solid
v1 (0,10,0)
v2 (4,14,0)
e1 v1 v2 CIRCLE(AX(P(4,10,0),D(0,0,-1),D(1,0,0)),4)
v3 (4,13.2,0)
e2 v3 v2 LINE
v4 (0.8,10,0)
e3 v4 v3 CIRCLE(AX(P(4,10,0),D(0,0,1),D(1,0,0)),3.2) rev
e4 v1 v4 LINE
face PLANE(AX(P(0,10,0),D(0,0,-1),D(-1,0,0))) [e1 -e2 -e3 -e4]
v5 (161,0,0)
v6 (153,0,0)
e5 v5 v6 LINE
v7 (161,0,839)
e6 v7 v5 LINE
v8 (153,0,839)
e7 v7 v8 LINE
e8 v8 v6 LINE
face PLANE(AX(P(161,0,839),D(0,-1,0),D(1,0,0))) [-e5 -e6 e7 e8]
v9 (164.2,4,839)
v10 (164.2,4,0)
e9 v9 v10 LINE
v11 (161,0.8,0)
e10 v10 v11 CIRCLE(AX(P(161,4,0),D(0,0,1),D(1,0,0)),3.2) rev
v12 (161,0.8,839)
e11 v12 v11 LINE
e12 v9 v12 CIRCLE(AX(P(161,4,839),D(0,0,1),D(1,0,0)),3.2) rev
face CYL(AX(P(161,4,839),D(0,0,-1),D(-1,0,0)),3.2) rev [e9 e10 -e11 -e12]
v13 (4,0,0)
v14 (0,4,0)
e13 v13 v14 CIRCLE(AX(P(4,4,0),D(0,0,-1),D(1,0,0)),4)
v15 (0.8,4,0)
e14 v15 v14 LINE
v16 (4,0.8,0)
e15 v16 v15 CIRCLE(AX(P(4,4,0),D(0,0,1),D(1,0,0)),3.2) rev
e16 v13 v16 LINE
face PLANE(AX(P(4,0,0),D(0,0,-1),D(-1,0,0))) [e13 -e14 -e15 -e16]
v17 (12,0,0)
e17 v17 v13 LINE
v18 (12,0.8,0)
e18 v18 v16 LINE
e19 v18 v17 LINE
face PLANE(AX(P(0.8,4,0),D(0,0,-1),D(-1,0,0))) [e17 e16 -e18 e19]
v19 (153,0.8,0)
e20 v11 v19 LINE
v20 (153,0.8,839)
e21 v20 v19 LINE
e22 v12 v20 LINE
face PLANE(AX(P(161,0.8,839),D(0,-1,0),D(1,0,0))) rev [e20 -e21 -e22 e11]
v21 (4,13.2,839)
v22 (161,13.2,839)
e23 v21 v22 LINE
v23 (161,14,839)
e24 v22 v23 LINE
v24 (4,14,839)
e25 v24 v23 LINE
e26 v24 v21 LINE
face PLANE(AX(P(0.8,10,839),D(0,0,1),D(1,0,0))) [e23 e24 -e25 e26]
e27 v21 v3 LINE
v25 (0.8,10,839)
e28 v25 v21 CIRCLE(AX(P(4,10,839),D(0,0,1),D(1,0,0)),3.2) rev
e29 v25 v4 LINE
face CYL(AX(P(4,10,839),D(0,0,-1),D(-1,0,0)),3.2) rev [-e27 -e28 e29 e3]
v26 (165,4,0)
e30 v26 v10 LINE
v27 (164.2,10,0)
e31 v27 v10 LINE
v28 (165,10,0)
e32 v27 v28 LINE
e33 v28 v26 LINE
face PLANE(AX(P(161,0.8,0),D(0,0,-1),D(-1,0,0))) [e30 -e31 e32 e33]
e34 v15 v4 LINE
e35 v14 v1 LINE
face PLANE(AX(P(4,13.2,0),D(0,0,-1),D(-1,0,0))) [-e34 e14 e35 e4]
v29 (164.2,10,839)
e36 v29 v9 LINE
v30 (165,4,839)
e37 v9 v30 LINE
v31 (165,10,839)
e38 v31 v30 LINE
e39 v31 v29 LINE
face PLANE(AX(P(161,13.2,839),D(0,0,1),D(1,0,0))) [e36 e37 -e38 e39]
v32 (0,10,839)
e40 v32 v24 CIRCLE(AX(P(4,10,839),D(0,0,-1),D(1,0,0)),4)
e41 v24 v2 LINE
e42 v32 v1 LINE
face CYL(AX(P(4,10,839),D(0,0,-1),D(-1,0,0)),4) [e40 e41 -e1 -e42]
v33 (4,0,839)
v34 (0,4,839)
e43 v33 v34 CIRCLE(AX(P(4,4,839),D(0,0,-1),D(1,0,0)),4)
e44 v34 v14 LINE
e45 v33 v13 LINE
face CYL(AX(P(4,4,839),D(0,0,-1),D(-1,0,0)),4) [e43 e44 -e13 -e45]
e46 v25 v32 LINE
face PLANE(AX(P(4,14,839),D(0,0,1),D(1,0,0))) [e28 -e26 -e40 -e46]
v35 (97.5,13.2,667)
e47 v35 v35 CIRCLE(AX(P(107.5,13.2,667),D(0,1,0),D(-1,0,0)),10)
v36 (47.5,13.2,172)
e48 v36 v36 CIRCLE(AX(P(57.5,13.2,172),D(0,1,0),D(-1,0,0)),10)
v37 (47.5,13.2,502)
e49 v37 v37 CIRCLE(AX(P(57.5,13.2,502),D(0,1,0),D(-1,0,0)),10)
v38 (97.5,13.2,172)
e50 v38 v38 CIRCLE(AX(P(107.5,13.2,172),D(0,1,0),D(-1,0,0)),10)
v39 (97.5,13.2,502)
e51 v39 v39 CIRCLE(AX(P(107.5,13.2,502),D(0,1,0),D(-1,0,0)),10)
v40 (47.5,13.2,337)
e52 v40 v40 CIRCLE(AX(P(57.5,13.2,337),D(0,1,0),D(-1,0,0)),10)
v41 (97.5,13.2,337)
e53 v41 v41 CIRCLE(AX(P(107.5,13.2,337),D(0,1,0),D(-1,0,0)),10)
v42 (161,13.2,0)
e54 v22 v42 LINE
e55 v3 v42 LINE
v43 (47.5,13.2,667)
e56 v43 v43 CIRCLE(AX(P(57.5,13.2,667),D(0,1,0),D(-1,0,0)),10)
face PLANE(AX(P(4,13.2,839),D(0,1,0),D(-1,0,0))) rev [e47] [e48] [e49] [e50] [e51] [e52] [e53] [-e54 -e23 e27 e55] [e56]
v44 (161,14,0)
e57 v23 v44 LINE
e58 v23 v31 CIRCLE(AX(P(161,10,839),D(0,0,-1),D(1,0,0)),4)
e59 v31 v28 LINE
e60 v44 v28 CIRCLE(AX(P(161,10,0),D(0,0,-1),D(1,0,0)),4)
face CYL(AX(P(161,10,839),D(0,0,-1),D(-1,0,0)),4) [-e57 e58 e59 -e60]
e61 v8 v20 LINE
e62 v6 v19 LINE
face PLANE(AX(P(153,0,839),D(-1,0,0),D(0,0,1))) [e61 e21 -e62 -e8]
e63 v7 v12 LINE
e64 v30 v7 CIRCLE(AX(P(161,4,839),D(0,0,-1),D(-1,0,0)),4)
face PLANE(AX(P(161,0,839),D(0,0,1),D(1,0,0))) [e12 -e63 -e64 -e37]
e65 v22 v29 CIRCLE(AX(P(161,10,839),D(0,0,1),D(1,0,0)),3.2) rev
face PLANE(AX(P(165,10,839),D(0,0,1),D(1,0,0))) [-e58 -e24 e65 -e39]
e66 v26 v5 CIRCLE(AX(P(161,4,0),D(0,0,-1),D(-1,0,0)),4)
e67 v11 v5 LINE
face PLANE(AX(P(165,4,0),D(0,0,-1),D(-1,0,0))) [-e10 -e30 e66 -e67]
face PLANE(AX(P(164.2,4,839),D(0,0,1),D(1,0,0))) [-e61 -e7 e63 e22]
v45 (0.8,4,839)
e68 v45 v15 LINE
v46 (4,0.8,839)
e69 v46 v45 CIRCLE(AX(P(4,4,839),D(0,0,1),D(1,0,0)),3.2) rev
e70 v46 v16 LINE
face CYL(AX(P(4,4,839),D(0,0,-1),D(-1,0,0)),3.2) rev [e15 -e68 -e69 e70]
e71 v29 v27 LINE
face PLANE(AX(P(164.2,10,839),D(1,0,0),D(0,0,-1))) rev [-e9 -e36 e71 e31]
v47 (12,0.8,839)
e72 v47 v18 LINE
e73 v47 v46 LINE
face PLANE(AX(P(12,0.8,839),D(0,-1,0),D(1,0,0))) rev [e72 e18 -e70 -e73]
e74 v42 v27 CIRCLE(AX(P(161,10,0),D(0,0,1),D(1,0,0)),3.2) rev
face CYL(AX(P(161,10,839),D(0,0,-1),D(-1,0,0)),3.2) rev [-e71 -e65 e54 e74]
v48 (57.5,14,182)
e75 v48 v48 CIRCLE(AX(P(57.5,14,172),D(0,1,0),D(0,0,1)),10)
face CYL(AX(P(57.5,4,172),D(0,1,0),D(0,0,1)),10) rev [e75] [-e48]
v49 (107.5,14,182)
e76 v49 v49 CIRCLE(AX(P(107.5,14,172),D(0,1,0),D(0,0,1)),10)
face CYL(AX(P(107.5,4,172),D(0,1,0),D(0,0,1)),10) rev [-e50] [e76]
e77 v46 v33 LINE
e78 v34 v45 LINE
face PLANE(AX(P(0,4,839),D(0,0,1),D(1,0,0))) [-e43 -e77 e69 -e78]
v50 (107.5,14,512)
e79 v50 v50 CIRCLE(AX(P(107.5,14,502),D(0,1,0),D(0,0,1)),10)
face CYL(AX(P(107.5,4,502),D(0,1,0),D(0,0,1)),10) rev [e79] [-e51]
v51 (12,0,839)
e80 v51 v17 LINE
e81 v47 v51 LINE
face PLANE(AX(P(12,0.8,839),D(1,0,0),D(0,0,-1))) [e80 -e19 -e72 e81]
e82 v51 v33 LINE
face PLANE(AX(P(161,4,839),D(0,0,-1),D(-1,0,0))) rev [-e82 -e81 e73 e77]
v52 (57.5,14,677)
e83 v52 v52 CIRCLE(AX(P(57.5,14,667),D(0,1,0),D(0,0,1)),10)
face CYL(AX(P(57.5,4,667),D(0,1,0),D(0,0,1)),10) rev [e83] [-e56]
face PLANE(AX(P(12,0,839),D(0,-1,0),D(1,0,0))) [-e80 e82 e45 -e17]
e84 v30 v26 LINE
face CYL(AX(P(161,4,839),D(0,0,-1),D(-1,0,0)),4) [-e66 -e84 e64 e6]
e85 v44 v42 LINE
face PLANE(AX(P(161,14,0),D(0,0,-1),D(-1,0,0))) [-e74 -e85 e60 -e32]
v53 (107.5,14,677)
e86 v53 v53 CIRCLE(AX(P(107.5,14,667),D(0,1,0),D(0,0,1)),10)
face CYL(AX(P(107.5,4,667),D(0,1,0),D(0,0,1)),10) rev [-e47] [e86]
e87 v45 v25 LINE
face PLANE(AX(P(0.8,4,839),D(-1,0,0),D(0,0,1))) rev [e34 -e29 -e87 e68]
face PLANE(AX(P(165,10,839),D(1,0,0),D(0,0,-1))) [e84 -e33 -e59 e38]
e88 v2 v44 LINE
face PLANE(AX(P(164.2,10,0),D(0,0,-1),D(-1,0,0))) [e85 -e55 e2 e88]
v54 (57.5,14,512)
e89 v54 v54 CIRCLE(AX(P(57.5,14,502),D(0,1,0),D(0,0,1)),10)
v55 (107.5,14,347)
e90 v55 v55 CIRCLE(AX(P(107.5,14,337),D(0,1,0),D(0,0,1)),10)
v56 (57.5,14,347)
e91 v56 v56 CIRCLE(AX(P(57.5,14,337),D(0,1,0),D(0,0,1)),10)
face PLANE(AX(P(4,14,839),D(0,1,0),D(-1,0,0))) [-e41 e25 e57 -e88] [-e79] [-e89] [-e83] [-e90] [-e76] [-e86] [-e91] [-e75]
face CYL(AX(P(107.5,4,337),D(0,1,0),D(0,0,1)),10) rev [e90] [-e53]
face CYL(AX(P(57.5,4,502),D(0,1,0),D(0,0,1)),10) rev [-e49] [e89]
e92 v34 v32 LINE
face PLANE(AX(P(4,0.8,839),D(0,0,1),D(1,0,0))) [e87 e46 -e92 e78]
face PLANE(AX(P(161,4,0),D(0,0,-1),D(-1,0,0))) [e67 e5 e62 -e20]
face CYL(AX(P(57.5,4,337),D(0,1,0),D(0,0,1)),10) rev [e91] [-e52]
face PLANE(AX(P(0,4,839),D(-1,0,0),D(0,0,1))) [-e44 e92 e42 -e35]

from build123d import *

# Parameters (mm, degrees)
BASE_FLANGE1_DEPTH = 839
SKETCH6_R          = 10
CUT_EXTRUDE1_DEPTH = 10


# Sheet-metal steps are written as plain solids
with BuildPart() as part:
    # Sketch1 → Base-Flange1 (new body)
    with BuildSketch(Plane.XY):
        with BuildLine():
            Line((12, 0), (4, 0))
            ThreePointArc((4, 0), (1.171572875, 1.171572875), (0, 4))
            Line((0, 4), (0, 10))
            ThreePointArc((0, 10), (1.171572875, 12.828427125), (4, 14))
            Line((4, 14), (161, 14))
            ThreePointArc((161, 14), (163.828427125, 12.828427125), (165, 10))
            Line((165, 10), (165, 4))
            ThreePointArc((165, 4), (163.828427125, 1.171572875), (161, 0))
            Line((161, 0), (153, 0))
            Line((153, 0), (153, 0.8))
            Line((153, 0.8), (161, 0.8))
            ThreePointArc((161, 0.8), (163.2627417, 1.7372583), (164.2, 4))
            Line((164.2, 4), (164.2, 10))
            ThreePointArc((164.2, 10), (163.2627417, 12.2627417), (161, 13.2))
            Line((161, 13.2), (4, 13.2))
            ThreePointArc((4, 13.2), (1.7372583, 12.2627417), (0.8, 10))
            Line((0.8, 10), (0.8, 4))
            ThreePointArc((0.8, 4), (1.7372583, 1.7372583), (4, 0.8))
            Line((4, 0.8), (12, 0.8))
            Line((12, 0.8), (12, 0))
        make_face()
    extrude(amount=BASE_FLANGE1_DEPTH)

    # Sketch6 → Cut-Extrude1 (cut)
    with BuildSketch(Plane(origin=(0, 14, 0), x_dir=(1, 0, 0), z_dir=(0, 1, 0))):
        with Locations(Location((107.5, -337, 0), (0, 0, 270))):
            Circle(SKETCH6_R)
        with Locations(Location((107.5, -172, 0), (0, 0, 270))):
            Circle(SKETCH6_R)
        with Locations(Location((107.5, -502, 0), (0, 0, 270))):
            Circle(SKETCH6_R)
        with Locations(Location((107.5, -667, 0), (0, 0, 270))):
            Circle(SKETCH6_R)
        with Locations(Location((57.5, -667, 0), (0, 0, 270))):
            Circle(SKETCH6_R)
        with Locations(Location((57.5, -502, 0), (0, 0, 270))):
            Circle(SKETCH6_R)
        with Locations(Location((57.5, -337, 0), (0, 0, 270))):
            Circle(SKETCH6_R)
        with Locations(Location((57.5, -172, 0), (0, 0, 270))):
            Circle(SKETCH6_R)
    extrude(amount=-CUT_EXTRUDE1_DEPTH, mode=Mode.SUBTRACT)


solid = part.part
